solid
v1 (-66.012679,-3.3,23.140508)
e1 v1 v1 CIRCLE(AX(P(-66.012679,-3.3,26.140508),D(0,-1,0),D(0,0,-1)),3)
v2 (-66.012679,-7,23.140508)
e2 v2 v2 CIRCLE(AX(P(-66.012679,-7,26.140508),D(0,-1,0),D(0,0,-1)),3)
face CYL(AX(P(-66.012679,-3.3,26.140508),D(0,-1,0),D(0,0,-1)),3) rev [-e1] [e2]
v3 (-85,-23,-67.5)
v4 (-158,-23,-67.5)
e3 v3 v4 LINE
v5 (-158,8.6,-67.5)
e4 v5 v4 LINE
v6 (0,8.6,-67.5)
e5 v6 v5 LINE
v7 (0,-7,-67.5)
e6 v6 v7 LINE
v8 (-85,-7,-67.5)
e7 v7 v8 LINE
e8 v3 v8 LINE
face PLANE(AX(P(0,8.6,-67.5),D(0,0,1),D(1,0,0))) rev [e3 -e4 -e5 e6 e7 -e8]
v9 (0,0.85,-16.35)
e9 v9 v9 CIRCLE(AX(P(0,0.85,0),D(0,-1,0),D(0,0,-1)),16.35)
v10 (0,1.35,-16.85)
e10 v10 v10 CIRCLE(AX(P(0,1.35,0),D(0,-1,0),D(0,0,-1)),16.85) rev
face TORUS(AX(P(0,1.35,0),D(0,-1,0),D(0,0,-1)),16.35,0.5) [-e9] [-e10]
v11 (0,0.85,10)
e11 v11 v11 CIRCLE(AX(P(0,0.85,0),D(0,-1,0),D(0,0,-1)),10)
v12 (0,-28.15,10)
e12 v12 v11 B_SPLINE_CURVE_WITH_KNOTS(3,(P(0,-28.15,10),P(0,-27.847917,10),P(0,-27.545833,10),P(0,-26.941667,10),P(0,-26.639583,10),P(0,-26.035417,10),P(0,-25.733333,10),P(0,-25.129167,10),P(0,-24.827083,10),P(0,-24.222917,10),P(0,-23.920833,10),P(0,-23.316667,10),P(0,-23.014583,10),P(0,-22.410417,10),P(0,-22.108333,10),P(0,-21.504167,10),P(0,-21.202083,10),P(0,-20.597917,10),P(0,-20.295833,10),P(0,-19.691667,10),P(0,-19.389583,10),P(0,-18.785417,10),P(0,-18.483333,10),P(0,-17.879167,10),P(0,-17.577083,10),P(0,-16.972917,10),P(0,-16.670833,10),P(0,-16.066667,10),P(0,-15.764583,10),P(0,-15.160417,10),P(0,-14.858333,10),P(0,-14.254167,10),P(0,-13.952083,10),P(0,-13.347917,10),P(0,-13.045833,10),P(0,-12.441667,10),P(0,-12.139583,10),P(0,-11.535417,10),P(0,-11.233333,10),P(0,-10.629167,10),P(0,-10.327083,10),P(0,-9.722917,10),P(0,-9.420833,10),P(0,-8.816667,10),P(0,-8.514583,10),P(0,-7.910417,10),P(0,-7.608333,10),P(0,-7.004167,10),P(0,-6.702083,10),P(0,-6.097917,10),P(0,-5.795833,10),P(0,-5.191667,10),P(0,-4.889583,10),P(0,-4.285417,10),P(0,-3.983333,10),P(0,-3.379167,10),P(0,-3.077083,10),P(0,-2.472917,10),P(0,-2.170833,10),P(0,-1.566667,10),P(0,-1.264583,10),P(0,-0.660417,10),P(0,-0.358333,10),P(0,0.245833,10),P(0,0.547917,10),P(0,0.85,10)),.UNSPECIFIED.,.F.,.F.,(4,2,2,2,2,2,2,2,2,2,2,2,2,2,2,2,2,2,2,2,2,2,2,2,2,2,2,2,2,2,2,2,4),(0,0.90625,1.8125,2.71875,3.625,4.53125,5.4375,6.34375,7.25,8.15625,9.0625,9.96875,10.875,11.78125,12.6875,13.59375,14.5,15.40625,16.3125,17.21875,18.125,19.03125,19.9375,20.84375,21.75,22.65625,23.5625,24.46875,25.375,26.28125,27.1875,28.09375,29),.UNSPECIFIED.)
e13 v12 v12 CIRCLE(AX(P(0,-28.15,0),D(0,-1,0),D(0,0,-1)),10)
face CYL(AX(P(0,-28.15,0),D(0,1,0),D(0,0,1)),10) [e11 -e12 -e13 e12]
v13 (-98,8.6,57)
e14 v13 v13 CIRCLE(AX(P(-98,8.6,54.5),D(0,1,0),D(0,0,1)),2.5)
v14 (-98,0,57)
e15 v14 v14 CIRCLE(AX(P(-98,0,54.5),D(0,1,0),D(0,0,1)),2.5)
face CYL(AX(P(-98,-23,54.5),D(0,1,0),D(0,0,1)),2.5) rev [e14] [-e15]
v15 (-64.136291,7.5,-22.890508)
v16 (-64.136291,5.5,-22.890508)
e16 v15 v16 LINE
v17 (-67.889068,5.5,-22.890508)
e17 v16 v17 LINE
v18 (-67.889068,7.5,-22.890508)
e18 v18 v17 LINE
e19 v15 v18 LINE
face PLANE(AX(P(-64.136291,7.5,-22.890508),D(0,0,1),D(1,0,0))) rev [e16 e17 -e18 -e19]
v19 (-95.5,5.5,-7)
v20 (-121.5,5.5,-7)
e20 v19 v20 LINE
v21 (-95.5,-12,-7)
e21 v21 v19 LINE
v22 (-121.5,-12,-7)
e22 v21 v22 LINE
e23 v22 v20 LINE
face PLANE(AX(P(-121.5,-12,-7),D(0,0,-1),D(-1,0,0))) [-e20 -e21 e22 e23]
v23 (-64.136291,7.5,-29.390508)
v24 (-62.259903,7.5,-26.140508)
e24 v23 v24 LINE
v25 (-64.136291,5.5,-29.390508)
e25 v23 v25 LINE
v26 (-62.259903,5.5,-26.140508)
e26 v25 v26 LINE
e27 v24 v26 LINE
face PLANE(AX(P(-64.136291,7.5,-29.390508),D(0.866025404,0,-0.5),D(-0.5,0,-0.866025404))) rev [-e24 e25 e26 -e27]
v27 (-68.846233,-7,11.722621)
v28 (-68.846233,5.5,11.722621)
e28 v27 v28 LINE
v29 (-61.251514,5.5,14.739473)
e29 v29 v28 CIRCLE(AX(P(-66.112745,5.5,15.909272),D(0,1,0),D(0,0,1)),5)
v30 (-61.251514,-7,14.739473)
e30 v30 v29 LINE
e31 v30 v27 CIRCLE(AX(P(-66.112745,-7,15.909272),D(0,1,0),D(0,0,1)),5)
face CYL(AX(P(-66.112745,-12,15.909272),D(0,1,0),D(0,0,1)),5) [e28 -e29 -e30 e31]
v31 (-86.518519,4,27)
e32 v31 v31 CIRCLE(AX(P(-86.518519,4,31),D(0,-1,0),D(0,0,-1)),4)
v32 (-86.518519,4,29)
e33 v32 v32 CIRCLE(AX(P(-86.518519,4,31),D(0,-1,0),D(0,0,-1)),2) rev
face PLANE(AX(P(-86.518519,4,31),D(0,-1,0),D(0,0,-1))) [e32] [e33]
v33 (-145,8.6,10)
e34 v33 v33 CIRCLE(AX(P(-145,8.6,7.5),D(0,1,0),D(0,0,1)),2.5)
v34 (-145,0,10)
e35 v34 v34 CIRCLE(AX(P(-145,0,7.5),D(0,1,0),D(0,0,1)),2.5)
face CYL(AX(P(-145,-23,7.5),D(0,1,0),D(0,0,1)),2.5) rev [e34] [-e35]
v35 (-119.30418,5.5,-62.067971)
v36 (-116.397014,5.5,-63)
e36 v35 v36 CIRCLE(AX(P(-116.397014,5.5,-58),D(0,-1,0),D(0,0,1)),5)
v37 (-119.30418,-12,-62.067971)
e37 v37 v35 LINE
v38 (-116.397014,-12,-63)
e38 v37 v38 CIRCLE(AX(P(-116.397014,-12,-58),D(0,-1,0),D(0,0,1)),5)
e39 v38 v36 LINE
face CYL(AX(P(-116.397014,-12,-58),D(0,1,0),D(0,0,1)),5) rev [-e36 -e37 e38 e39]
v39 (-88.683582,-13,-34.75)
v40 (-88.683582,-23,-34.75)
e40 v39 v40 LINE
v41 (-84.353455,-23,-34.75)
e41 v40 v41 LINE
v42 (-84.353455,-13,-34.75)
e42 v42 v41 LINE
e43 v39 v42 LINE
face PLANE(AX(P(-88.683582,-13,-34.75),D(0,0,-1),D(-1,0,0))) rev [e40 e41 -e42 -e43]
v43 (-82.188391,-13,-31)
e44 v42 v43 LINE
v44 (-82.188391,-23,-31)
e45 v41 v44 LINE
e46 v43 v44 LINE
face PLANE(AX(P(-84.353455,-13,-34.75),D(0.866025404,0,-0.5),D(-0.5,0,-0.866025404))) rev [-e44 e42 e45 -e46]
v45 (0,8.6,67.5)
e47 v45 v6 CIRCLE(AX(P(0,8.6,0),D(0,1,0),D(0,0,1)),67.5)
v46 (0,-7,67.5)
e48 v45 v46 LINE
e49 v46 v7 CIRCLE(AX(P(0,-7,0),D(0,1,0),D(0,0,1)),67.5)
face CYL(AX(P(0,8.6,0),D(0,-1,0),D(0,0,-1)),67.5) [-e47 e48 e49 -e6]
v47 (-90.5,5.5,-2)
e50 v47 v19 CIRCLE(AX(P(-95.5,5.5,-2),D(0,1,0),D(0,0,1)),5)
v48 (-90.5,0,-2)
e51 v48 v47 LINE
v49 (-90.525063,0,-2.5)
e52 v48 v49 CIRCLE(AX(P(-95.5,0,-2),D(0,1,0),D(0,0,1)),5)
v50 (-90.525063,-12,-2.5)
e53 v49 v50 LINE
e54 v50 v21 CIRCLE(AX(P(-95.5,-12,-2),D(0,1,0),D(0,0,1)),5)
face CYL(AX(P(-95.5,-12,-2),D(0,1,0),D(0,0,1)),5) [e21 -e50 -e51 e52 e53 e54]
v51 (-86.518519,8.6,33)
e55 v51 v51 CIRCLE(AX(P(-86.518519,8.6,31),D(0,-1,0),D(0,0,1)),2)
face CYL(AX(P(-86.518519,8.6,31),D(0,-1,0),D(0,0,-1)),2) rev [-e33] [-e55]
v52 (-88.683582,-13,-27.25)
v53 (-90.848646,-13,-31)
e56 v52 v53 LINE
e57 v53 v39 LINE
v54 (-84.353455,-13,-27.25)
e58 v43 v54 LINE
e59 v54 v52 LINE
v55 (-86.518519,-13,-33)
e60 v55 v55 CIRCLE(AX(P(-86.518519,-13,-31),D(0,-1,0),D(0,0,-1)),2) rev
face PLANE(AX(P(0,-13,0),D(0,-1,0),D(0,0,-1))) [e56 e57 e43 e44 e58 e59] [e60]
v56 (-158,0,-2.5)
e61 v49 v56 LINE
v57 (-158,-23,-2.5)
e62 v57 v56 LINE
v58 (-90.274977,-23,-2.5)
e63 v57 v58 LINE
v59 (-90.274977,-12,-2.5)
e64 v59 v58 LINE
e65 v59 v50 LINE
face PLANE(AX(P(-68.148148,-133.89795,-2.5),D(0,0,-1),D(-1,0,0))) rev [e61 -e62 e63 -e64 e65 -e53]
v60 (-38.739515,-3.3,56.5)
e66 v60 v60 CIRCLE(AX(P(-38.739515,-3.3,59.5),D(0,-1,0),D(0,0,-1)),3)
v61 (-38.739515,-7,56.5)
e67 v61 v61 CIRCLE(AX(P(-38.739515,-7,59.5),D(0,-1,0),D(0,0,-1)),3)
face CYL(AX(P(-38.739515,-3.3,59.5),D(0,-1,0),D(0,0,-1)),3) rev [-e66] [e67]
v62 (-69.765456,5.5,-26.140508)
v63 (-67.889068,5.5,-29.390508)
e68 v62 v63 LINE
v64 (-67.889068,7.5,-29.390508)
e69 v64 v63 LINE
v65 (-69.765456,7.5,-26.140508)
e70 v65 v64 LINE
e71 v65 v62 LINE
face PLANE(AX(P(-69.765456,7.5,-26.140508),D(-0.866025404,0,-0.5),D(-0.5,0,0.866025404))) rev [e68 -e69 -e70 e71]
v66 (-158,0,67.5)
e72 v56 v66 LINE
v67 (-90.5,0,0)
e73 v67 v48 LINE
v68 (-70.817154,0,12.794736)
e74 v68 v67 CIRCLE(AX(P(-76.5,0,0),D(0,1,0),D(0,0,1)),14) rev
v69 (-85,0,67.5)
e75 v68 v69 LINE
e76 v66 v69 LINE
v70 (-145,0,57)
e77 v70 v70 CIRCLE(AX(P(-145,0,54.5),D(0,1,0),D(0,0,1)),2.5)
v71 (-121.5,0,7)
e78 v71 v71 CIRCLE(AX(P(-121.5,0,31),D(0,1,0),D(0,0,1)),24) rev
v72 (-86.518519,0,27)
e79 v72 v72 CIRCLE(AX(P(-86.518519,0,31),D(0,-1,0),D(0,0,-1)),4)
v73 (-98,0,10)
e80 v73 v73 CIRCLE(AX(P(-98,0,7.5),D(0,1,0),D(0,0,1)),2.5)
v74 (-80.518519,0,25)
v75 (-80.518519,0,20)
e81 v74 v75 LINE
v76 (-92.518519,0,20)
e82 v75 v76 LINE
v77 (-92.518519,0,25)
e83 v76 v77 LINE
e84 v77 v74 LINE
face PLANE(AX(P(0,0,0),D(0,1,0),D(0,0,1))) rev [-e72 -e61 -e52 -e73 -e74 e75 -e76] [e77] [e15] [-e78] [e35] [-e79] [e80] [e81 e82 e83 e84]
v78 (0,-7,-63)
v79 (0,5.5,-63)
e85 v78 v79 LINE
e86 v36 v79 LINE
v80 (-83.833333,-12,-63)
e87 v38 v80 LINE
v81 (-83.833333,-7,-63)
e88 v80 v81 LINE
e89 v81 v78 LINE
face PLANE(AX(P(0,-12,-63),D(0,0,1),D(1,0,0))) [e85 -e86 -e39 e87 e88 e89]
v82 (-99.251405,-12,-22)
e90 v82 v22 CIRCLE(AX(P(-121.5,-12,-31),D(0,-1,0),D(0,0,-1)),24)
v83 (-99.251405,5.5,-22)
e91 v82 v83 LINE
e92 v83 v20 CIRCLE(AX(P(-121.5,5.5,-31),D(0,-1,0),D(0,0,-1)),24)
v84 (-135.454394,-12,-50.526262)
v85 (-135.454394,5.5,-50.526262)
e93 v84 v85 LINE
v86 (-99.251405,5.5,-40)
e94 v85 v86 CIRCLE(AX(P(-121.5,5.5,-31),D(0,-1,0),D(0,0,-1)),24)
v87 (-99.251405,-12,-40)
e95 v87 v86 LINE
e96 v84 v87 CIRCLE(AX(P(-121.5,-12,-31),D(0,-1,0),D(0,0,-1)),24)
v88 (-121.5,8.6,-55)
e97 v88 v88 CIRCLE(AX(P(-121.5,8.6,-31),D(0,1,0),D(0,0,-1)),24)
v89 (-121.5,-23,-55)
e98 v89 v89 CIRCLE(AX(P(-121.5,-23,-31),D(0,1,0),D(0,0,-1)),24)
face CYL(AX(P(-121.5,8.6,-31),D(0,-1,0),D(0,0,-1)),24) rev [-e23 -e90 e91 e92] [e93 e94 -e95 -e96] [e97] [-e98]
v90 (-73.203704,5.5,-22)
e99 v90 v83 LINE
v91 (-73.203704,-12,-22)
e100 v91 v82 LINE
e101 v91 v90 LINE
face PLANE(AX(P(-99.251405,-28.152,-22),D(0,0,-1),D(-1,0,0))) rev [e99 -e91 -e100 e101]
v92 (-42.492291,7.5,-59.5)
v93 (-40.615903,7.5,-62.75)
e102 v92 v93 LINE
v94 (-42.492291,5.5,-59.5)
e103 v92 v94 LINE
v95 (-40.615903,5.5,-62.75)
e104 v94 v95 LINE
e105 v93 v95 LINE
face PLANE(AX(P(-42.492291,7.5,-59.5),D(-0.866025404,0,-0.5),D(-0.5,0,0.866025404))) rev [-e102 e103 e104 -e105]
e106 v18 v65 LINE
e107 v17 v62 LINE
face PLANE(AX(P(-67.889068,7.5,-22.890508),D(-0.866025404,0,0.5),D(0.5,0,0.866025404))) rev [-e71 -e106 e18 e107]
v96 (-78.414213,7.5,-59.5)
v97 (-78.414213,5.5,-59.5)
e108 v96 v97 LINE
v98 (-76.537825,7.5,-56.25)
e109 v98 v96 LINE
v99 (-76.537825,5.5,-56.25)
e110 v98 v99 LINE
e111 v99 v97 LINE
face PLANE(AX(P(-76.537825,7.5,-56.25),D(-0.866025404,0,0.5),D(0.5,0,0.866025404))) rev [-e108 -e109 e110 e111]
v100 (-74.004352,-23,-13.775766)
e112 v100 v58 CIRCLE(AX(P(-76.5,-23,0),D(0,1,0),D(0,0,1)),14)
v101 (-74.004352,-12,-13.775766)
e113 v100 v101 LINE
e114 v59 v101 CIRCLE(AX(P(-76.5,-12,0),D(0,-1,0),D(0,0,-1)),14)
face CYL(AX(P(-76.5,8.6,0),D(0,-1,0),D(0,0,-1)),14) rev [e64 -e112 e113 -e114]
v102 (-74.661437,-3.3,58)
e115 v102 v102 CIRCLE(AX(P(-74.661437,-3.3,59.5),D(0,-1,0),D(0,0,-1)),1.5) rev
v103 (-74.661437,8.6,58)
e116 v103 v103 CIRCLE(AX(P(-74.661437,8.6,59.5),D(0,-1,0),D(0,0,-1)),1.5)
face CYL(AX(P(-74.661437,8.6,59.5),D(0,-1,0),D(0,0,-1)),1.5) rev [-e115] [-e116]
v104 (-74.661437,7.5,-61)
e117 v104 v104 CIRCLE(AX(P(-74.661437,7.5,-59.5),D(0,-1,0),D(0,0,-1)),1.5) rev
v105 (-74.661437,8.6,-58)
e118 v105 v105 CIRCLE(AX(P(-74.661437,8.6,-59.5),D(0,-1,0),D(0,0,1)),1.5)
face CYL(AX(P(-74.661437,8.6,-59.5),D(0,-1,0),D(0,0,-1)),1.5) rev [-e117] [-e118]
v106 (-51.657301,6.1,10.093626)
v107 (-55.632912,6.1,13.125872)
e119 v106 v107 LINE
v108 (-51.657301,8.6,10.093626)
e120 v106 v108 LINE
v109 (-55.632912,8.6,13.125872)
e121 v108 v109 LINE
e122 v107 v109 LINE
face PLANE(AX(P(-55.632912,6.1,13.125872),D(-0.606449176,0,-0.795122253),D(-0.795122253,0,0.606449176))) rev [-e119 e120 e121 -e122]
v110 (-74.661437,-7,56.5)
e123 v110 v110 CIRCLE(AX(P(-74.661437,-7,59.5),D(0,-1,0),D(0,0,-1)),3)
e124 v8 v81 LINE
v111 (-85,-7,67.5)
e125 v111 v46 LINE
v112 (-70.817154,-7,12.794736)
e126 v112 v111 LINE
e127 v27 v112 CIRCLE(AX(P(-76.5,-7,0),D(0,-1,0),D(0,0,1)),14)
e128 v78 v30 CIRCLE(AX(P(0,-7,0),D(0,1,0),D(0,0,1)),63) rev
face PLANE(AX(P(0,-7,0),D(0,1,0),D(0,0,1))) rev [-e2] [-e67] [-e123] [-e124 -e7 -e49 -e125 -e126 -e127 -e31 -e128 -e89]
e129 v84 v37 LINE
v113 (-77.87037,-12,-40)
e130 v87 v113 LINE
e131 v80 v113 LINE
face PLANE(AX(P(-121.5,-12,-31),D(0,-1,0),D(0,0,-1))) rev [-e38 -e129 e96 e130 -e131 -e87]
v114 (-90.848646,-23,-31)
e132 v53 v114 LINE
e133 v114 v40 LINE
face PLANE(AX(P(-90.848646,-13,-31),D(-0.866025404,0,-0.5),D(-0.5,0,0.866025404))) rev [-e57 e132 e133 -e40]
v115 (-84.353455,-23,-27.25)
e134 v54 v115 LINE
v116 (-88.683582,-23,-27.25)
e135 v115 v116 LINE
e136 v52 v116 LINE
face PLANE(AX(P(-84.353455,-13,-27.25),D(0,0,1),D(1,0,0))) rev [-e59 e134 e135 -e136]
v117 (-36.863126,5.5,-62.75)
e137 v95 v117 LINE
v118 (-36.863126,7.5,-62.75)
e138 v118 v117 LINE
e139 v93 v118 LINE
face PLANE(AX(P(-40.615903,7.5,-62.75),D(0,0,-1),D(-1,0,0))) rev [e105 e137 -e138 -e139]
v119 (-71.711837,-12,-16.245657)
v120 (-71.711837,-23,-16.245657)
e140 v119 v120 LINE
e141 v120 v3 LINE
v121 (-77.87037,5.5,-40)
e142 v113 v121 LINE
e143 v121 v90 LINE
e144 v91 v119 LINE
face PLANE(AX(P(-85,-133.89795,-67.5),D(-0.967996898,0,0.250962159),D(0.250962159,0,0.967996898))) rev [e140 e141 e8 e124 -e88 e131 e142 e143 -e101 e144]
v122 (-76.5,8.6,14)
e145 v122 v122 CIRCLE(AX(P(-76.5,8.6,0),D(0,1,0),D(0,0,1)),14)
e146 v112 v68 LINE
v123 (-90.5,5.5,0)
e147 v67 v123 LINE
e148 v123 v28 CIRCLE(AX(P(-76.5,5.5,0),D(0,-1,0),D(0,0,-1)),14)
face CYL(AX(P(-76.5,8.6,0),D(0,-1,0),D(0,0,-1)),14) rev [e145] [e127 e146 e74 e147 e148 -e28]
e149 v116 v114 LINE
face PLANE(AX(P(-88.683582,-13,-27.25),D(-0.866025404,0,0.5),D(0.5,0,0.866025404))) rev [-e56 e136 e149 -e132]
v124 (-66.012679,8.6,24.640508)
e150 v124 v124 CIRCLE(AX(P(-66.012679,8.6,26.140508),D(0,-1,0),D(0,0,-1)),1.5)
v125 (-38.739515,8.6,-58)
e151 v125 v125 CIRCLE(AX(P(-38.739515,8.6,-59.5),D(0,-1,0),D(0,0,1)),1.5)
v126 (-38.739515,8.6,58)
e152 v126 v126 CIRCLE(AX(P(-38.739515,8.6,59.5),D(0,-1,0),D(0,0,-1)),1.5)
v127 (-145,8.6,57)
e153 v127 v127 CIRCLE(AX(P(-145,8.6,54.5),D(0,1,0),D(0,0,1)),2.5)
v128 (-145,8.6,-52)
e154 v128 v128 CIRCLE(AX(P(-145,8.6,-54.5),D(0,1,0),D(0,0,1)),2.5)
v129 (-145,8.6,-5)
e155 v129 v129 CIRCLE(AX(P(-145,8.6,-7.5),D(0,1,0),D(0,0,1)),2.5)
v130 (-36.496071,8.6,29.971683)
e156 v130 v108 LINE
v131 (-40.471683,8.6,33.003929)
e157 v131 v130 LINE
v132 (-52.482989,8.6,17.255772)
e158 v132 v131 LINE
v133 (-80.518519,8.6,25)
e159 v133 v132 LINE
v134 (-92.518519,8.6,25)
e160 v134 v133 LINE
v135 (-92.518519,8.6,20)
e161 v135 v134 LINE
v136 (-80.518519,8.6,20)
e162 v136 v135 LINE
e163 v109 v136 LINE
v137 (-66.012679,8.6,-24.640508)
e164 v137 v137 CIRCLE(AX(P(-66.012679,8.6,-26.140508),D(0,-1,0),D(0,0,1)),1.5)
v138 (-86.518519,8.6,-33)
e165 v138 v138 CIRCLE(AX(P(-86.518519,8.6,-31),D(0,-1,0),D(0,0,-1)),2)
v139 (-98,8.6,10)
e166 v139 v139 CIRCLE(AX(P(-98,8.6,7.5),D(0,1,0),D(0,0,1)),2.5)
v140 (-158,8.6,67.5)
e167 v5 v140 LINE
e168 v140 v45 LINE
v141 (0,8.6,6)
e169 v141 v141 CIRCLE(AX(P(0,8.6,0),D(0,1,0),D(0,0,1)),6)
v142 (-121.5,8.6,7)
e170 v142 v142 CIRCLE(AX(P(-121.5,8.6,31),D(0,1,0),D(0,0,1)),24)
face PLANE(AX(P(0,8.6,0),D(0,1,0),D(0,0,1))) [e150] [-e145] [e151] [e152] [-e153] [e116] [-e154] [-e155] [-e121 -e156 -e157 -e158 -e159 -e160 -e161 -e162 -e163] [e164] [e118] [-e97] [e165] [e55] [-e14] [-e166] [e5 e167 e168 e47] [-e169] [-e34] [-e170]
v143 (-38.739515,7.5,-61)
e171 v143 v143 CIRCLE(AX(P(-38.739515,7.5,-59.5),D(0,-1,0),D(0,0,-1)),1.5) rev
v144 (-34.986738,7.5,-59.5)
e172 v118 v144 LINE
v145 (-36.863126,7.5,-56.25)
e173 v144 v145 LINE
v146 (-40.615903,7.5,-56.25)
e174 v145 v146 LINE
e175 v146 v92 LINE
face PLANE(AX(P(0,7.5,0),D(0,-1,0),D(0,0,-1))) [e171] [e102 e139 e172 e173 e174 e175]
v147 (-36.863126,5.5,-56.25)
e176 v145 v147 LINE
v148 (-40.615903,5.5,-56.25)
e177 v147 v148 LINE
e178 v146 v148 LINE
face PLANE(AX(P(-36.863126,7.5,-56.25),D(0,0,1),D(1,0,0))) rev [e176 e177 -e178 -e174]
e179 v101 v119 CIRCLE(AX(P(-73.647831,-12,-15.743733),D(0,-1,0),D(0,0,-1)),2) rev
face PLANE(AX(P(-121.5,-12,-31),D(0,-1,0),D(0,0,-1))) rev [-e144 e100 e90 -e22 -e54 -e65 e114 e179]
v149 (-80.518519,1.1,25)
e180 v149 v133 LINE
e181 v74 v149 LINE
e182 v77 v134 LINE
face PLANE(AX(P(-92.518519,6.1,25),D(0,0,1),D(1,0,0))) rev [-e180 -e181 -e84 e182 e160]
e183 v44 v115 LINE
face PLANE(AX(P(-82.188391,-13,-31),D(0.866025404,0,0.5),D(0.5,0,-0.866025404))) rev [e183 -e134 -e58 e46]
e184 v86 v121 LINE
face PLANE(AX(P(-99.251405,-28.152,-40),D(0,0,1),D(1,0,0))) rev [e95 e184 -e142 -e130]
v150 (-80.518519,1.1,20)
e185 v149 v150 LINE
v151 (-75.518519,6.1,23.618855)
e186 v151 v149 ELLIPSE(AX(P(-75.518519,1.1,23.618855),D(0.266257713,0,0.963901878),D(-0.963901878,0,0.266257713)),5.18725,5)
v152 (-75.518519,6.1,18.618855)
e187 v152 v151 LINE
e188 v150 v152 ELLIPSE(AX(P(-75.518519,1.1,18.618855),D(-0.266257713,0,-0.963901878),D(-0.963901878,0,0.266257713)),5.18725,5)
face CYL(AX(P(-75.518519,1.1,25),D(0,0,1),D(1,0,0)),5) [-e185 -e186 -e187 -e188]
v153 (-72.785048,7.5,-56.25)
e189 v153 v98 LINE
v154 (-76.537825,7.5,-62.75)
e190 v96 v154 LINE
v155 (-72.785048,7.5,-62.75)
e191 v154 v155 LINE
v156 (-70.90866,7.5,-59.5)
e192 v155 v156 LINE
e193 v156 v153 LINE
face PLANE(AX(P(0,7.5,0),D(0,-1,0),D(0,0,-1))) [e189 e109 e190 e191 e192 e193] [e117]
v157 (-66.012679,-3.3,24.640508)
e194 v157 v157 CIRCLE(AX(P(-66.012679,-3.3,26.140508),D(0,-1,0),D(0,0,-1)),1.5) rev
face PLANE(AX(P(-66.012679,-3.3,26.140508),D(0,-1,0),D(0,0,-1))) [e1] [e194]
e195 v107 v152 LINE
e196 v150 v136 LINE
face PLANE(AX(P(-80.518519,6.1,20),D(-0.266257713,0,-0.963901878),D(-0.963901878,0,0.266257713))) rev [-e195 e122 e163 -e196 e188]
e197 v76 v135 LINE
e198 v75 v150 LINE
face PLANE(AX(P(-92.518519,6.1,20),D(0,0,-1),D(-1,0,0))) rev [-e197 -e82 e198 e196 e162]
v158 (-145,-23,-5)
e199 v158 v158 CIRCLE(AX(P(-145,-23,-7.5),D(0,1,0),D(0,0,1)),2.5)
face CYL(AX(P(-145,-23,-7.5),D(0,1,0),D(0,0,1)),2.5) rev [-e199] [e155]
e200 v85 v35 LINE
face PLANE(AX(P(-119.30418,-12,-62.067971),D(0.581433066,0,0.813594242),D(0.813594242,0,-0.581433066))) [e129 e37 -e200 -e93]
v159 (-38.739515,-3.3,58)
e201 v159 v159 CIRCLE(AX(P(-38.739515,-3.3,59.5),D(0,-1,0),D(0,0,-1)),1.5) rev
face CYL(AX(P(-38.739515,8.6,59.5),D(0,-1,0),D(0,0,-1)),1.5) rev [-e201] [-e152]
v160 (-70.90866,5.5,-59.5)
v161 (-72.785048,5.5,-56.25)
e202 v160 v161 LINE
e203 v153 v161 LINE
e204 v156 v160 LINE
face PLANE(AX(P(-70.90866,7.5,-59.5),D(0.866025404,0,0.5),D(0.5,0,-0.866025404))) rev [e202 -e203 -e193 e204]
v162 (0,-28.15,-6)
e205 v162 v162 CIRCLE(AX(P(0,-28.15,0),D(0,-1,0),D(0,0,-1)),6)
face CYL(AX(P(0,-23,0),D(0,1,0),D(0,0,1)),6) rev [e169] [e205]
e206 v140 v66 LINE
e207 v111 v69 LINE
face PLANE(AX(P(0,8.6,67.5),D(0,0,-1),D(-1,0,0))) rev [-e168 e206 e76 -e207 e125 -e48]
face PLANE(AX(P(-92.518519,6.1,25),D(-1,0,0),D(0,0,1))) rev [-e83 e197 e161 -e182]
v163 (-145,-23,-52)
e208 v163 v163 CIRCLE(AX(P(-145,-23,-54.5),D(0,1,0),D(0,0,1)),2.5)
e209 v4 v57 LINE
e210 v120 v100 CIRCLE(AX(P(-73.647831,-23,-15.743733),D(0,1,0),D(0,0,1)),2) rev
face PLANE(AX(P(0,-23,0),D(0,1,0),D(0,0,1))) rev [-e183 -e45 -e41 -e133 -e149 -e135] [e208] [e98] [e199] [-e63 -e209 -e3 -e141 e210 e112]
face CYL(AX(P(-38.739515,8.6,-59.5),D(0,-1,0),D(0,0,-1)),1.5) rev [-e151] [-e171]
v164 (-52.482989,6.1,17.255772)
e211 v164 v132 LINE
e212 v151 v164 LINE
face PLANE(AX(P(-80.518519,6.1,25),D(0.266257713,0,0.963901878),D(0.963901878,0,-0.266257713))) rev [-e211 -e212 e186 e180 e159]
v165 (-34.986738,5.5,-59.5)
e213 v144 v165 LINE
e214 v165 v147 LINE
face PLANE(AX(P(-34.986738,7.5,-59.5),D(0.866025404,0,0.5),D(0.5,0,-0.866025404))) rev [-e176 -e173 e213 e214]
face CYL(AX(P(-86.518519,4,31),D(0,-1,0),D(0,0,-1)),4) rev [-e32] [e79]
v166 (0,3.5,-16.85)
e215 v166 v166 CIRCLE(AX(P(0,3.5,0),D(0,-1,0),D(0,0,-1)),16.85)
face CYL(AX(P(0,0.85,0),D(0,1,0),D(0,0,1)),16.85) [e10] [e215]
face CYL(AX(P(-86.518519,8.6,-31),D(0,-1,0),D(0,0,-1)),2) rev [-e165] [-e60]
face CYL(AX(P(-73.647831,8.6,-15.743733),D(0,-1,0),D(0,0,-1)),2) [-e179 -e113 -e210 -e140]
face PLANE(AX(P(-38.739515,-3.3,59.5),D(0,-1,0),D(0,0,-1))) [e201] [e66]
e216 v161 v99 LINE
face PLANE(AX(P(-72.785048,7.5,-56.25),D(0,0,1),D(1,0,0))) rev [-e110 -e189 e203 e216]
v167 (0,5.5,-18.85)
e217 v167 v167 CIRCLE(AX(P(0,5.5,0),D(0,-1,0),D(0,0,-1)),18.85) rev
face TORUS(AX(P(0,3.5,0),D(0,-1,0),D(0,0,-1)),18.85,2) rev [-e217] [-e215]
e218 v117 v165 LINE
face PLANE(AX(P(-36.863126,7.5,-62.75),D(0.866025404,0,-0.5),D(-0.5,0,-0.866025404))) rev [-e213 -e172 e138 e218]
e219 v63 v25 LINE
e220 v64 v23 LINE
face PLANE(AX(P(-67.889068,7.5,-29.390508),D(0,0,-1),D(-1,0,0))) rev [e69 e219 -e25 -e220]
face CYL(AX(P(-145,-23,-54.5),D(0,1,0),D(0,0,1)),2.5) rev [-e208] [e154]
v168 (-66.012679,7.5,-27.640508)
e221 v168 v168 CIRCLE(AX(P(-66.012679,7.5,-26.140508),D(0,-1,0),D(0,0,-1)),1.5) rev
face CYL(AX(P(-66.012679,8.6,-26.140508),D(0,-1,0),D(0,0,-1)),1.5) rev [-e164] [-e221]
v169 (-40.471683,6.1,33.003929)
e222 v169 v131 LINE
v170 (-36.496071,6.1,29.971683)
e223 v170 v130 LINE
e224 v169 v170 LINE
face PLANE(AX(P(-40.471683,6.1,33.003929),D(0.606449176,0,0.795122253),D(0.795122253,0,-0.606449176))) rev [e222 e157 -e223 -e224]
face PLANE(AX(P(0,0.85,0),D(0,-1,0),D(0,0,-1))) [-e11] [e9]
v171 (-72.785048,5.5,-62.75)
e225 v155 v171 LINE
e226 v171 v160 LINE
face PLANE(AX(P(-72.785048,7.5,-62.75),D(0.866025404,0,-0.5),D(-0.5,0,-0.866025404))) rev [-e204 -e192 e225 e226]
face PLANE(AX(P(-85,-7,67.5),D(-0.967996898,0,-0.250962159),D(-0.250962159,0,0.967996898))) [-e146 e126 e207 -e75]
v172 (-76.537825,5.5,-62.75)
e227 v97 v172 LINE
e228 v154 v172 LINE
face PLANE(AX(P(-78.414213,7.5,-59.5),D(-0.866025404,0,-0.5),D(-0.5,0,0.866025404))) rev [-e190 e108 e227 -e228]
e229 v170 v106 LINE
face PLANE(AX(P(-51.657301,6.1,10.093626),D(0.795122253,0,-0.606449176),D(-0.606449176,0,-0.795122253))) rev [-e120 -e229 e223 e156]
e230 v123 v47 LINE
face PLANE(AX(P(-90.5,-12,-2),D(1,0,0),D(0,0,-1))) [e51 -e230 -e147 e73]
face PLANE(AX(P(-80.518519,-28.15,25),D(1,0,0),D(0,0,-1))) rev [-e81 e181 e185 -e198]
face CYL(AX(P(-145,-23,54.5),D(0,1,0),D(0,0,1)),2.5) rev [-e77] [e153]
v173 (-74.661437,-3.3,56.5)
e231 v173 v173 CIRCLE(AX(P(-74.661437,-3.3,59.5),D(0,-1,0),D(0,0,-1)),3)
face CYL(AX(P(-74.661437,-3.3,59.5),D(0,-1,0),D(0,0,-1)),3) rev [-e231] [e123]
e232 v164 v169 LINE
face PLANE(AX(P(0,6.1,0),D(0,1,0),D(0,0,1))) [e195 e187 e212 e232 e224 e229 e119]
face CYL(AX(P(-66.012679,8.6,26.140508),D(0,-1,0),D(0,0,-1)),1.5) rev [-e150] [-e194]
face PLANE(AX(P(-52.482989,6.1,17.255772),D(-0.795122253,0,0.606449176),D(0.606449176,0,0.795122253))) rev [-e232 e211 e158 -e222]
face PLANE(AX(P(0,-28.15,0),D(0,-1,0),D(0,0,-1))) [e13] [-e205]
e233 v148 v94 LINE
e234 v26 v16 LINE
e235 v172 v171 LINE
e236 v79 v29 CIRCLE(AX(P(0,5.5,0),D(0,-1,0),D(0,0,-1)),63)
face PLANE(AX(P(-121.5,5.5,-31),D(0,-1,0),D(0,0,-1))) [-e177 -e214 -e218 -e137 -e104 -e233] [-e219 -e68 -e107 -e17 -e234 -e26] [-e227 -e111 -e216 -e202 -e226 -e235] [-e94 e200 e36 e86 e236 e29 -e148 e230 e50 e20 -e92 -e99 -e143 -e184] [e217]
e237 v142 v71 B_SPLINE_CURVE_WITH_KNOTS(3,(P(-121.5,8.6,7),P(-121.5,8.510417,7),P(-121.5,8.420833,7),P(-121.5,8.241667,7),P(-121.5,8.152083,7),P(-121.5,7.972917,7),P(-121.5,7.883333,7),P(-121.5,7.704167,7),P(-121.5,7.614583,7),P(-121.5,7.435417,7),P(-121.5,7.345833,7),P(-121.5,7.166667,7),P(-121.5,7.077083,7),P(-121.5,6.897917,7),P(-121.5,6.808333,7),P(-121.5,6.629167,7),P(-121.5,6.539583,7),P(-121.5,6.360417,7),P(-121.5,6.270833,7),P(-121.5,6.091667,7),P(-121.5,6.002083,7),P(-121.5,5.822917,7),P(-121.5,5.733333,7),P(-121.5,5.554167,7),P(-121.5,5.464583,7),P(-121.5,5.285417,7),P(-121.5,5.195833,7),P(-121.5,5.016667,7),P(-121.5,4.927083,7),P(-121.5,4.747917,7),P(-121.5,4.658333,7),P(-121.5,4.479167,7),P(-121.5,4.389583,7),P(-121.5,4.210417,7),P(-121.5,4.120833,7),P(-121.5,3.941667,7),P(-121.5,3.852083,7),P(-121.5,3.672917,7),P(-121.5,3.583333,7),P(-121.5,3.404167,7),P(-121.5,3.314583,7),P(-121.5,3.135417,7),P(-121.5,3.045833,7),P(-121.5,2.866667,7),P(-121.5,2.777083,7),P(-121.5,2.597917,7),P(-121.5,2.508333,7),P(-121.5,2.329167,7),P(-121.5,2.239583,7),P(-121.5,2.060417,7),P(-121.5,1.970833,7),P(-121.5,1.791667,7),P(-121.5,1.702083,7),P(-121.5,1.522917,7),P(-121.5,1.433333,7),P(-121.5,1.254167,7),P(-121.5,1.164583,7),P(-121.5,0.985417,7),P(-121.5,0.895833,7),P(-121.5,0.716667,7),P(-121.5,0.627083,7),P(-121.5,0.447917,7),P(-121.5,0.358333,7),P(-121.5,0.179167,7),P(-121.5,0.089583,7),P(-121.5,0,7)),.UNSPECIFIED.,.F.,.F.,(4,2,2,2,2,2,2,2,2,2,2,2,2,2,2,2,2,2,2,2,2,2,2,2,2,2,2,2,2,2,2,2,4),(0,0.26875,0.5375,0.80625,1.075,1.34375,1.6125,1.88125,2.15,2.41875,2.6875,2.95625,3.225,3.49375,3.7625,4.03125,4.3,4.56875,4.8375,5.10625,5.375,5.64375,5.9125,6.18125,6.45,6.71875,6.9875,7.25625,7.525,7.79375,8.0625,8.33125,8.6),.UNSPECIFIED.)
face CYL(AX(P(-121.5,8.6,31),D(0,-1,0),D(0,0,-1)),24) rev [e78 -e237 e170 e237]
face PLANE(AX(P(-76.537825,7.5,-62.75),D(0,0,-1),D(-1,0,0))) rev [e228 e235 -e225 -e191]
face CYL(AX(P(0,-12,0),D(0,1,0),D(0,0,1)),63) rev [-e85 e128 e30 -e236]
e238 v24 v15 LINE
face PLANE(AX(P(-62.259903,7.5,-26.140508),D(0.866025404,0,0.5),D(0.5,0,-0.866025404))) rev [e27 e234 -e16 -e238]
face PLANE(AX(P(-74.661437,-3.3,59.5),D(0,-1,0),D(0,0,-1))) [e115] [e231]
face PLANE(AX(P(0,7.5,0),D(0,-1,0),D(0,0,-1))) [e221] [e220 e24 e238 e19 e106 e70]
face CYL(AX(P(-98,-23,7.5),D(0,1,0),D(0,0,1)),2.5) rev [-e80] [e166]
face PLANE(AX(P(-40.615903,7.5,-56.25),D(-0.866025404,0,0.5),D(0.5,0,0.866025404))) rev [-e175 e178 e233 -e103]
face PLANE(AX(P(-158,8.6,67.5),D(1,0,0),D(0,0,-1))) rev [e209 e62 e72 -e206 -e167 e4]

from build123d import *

# Parameters (mm, degrees)
SALIENTE_EXTRUIR4_DEPTH    = 8.6
SALIENTE_EXTRUIR2_DEPTH    = 23
CORTAR_EXTRUIR1_DEPTH      = 174.347194959
CORTAR_EXTRUIR1_DEPTH_BACK = 174.347194959
CROQUIS2_R                 = 14
CROQUIS2_R_2               = 24
CROQUIS5_R                 = 2.5
CORTAR_EXTRUIR2_DEPTH      = 175.696336539
SALIENTE_EXTRUIR3_START    = -15.6
SALIENTE_EXTRUIR3_DEPTH    = 15.6
CORTAR_EXTRUIR3_DEPTH      = 174.347194959
CORTAR_EXTRUIR3_DEPTH_BACK = 174.347194959
CROQUIS7_R                 = 6
CORTAR_EXTRUIR4_DEPTH      = 5
CORTAR_EXTRUIR4_DEPTH_BACK = 12.5
REDONDEO1_R                = 2
CROQUIS9_R                 = 16.85
CROQUIS9_R_2               = 6
SALIENTE_EXTRUIR5_DEPTH    = 4.65
CROQUIS10_R                = 10
CROQUIS10_R_2              = 6
SALIENTE_EXTRUIR6_DEPTH    = 29
REDONDEO2_R                = 0.5
REDONDEO3_R                = 2
SALIENTE_EXTRUIR7_REACH    = 177.079
CROQUIS12_R                = 1.5
CORTAR_EXTRUIR5_DEPTH      = 174.111445318
CORTAR_EXTRUIR6_DEPTH      = 2
CROQUIS14_R                = 3
CORTAR_EXTRUIR7_DEPTH      = 3.7
CROQUIS15_R                = 2
CORTAR_EXTRUIR8_DEPTH      = 175.696336539
CROQUIS16_R                = 4
CORTAR_EXTRUIR9_DEPTH      = 4
CORTAR_EXTRUIR10_DEPTH     = 10
CORTAR_EXTRUIR11_DEPTH     = 2.5
CROQUIS20_W                = 12
CROQUIS20_H                = 5
CORTAR_EXTRUIR12_DEPTH     = 176.700917755
REDONDEO4_R                = 5


with BuildPart() as part:
    # Croquis1 → Saliente-Extruir4 (new body)
    with BuildSketch(Plane(origin=(0, 0, 0), x_dir=(1, 0, 0), z_dir=(0, 1, 0))):
        with BuildLine():
            Line((0, -67.5), (-158, -67.5))
            Line((-158, -67.5), (-158, 67.5))
            Line((-158, 67.5), (0, 67.5))
            ThreePointArc((0, 67.5), (67.5, 0), (0, -67.5))
        make_face()
    extrude(amount=SALIENTE_EXTRUIR4_DEPTH)

    # Croquis3 → Saliente-Extruir2 (add)
    with BuildSketch(Plane.XZ):
        Polygon((-85, -67.5), (-68.148148148, -2.5), (-158, -2.5), (-158, -67.5), align=None)
    extrude(amount=SALIENTE_EXTRUIR2_DEPTH)

    # Croquis2 → Cortar-Extruir1 (cut, two sides: drawn at the far end of the back side and taken through both)
    with BuildSketch(Plane(origin=(0, 0, 0), x_dir=(1, 0, 0), z_dir=(0, 1, 0)).offset(-CORTAR_EXTRUIR1_DEPTH_BACK)):
        with Locations(Location((-76.5, 0, 0), (0, 0, 66.051358792))):
            Circle(CROQUIS2_R)
        with Locations(Location((-121.5, 31, 0), (0, 0, 90))):
            Circle(CROQUIS2_R_2)
        with Locations(Location((-121.5, -31, 0), (0, 0, 90))):
            Circle(CROQUIS2_R_2)
    extrude(amount=CORTAR_EXTRUIR1_DEPTH + CORTAR_EXTRUIR1_DEPTH_BACK, mode=Mode.SUBTRACT)

    # Croquis5 → Cortar-Extruir2 (cut, through all)
    with BuildSketch(Plane(origin=(0, 8.6, 0), x_dir=(1, 0, 0), z_dir=(0, 1, 0))):
        with Locations(Location((-145, -7.5, 0), (0, 0, 270))):
            Circle(CROQUIS5_R)
        with Locations(Location((-145, -54.5, 0), (0, 0, 270))):
            Circle(CROQUIS5_R)
        with Locations(Location((-98, -54.5, 0), (0, 0, 270))):
            Circle(CROQUIS5_R)
        with Locations(Location((-98, -7.5, 0), (0, 0, 270))):
            Circle(CROQUIS5_R)
        with Locations(Location((-145, 7.5, 0), (0, 0, 270))):
            Circle(CROQUIS5_R)
        with Locations(Location((-145, 54.5, 0), (0, 0, 270))):
            Circle(CROQUIS5_R)
    extrude(amount=-CORTAR_EXTRUIR2_DEPTH, mode=Mode.SUBTRACT)

    # Croquis6 → Saliente-Extruir3 (add)
    with BuildSketch(Plane(origin=(0, 8.6, 0), x_dir=(1, 0, 0), z_dir=(0, 1, 0)).offset(SALIENTE_EXTRUIR3_START)):
        with BuildLine():
            Line((0, -67.5), (-85, -67.5))
            Line((-85, -67.5), (-70.817153658, -12.794735536))
            ThreePointArc((-70.817153658, -12.794735536), (-62.5, 0), (-70.817153658, 12.794735536))
            Line((-70.817153658, 12.794735536), (-85, 67.5))
            Line((-85, 67.5), (0, 67.5))
            ThreePointArc((0, 67.5), (67.5, 0), (0, -67.5))
        make_face()
    extrude(amount=SALIENTE_EXTRUIR3_DEPTH)

    # Croquis7 → Cortar-Extruir3 (cut, two sides: drawn at the far end of the back side and taken through both)
    with BuildSketch(Plane(origin=(0, 0, 0), x_dir=(1, 0, 0), z_dir=(0, 1, 0)).offset(-CORTAR_EXTRUIR3_DEPTH_BACK)):
        with Locations(Location((0, 0, 0), (0, 0, 270))):
            Circle(CROQUIS7_R)
    extrude(amount=CORTAR_EXTRUIR3_DEPTH + CORTAR_EXTRUIR3_DEPTH_BACK, mode=Mode.SUBTRACT)

    # Croquis8 → Cortar-Extruir4 (cut, two sides: drawn at the far end of the back side and taken through both)
    with BuildSketch(Plane.XZ.offset(7).offset(-CORTAR_EXTRUIR4_DEPTH_BACK)):
        with BuildLine():
            Line((0, -63), (-116.397014468, -63))
            ThreePointArc((-116.397014468, -63), (-117.923471798, -62.761294784), (-119.304179798, -62.067971208))
            Line((-119.304179798, -62.067971208), (-135.454393581, -50.526261798))
            ThreePointArc((-135.454393581, -50.526261798), (-144.354214963, -23.673004816), (-121.5, -7))
            Line((-121.5, -7), (-95.5, -7))
            ThreePointArc((-95.5, -7), (-91.964466094, -5.535533906), (-90.5, -2))
            Line((-90.5, -2), (-90.5, 0))
            ThreePointArc((-90.5, 0), (-84.130208097, 11.737969347), (-70.817153658, 12.794735536))
            ThreePointArc((-70.817153658, 12.794735536), (-69.810181657, 12.29822469), (-68.84623323, 11.722621474))
            ThreePointArc((-68.84623323, 11.722621474), (-64.266892893, 11.262463458), (-61.251513841, 14.739472589))
            ThreePointArc((-61.251513841, 14.739472589), (49.485284546, 38.989827051), (0, -63))
        make_face()
    extrude(amount=CORTAR_EXTRUIR4_DEPTH + CORTAR_EXTRUIR4_DEPTH_BACK, mode=Mode.SUBTRACT)


with BuildPart() as cortar_extruir4_kept_piece:
    # of the separate pieces the step leaves, the one the design keeps (cortar_extruir4_pieces_kept)
    add(part.part.solids().sort_by_distance((0, 8.6, 67.5))[0])

    # Redondeo1
    redondeo1_edges = [cortar_extruir4_kept_piece.edges().sort_by_distance(p)[0] for p in [
        (-70.817153658, -17.5, -12.794735536),
    ]]
    fillet(redondeo1_edges, radius=REDONDEO1_R)

    # Croquis9 → Saliente-Extruir5 (add)
    with BuildSketch(Plane.XZ.offset(-5.5)):
        with Locations(Location((0, 0, 0), (0, 0, 270))):
            Circle(CROQUIS9_R)
        with Locations(Location((0, 0, 0), (0, 0, 90))):
            Circle(CROQUIS9_R_2, mode=Mode.SUBTRACT)
    extrude(amount=SALIENTE_EXTRUIR5_DEPTH)

    # Croquis10 → Saliente-Extruir6 (add)
    with BuildSketch(Plane.XZ.offset(-0.85)):
        with Locations(Location((0, 0, 0), (0, 0, 90))):
            Circle(CROQUIS10_R)
        with Locations(Location((0, 0, 0), (0, 0, 90))):
            Circle(CROQUIS10_R_2, mode=Mode.SUBTRACT)
    extrude(amount=SALIENTE_EXTRUIR6_DEPTH)

    # Redondeo2
    redondeo2_edges = [cortar_extruir4_kept_piece.edges().sort_by_distance(p)[0] for p in [
        (0, 0.85, 16.85),
    ]]
    fillet(redondeo2_edges, radius=REDONDEO2_R)

    # Redondeo3
    redondeo3_edges = [cortar_extruir4_kept_piece.edges().sort_by_distance(p)[0] for p in [
        (0, 5.5, 16.85),
    ]]
    fillet(redondeo3_edges, radius=REDONDEO3_R)

    # Croquis11 → Saliente-Extruir7 (add, up to next)
    with BuildSketch(Plane.XZ.offset(-5.5), mode=Mode.PRIVATE) as saliente_extruir7_sk1:
        with BuildLine():
            Line((-73.203703704, -22), (-77.87037037, -40))
            Line((-77.87037037, -40), (-99.251404539, -40))
            ThreePointArc((-99.251404539, -40), (-97.5, -31), (-99.251404539, -22))
            Line((-99.251404539, -22), (-73.203703704, -22))
        make_face()
    saliente_extruir7_tool1 = extrude(saliente_extruir7_sk1.sketch, amount=SALIENTE_EXTRUIR7_REACH, mode=Mode.PRIVATE) - cortar_extruir4_kept_piece.part
    add(saliente_extruir7_tool1.solids().sort_by_distance((-86.771742, 5.5, -30.689413))[0])

    # Croquis12 → Cortar-Extruir5 (cut, through all)
    with BuildSketch(Plane.XZ.offset(7)):
        with Locations(Location((-74.661436633, 59.5, 0), (0, 0, 270))):
            Circle(CROQUIS12_R)
        with Locations(Location((-66.012679429, 26.140507926, 0), (0, 0, 270))):
            Circle(CROQUIS12_R)
        with Locations(Location((-38.73951471, 59.5, 0), (0, 0, 270))):
            Circle(CROQUIS12_R)
        with Locations(Location((-38.73951471, -59.5, 0), (0, 0, 270))):
            Circle(CROQUIS12_R)
        with Locations(Location((-74.661436633, -59.5, 0), (0, 0, 270))):
            Circle(CROQUIS12_R)
        with Locations(Location((-66.012679429, -26.140507926, 0), (0, 0, 270))):
            Circle(CROQUIS12_R)
    extrude(amount=-CORTAR_EXTRUIR5_DEPTH, mode=Mode.SUBTRACT)

    # Croquis13 → Cortar-Extruir6 (cut)
    with BuildSketch(Plane.XZ.offset(-5.5)):
        Polygon((-70.908659884, -59.5), (-72.785048259, -56.25), (-76.537825008, -56.25), (-78.414213383, -59.5), (-76.537825008, -62.75), (-72.785048259, -62.75), align=None)
        Polygon((-62.259902679, -26.140507926), (-64.136291054, -22.890507926), (-67.889067804, -22.890507926), (-69.765456179, -26.140507926), (-67.889067804, -29.390507926), (-64.136291054, -29.390507926), align=None)
        Polygon((-34.986737961, -59.5), (-36.863126336, -56.25), (-40.615903085, -56.25), (-42.49229146, -59.5), (-40.615903085, -62.75), (-36.863126336, -62.75), align=None)
    extrude(amount=-CORTAR_EXTRUIR6_DEPTH, mode=Mode.SUBTRACT)

    # Croquis14 → Cortar-Extruir7 (cut)
    with BuildSketch(Plane.XZ.offset(7)):
        with Locations(Location((-66.012679429, 26.140507926, 0), (0, 0, 270))):
            Circle(CROQUIS14_R)
        with Locations(Location((-74.661436633, 59.5, 0), (0, 0, 270))):
            Circle(CROQUIS14_R)
        with Locations(Location((-38.73951471, 59.5, 0), (0, 0, 270))):
            Circle(CROQUIS14_R)
    extrude(amount=-CORTAR_EXTRUIR7_DEPTH, mode=Mode.SUBTRACT)

    # Croquis15 → Cortar-Extruir8 (cut, through all)
    with BuildSketch(Plane.XZ.offset(23)):
        with Locations(Location((-86.518518519, -31, 0), (0, 0, 270))):
            Circle(CROQUIS15_R)
        with Locations(Location((-86.518518519, 31, 0), (0, 0, 90))):
            Circle(CROQUIS15_R)
    extrude(amount=-CORTAR_EXTRUIR8_DEPTH, mode=Mode.SUBTRACT)

    # Croquis16 → Cortar-Extruir9 (cut)
    with BuildSketch(Plane.XZ):
        with Locations(Location((-86.518518519, 31, 0), (0, 0, 270))):
            Circle(CROQUIS16_R)
    extrude(amount=-CORTAR_EXTRUIR9_DEPTH, mode=Mode.SUBTRACT)

    # Croquis17 → Cortar-Extruir10 (cut)
    with BuildSketch(Plane.XZ.offset(23)):
        Polygon((-82.1883915, -31), (-84.353455009, -27.25), (-88.683582028, -27.25), (-90.848645537, -31), (-88.683582028, -34.75), (-84.353455009, -34.75), align=None)
    extrude(amount=-CORTAR_EXTRUIR10_DEPTH, mode=Mode.SUBTRACT)

    # Croquis19 → Cortar-Extruir11 (cut)
    with BuildSketch(Plane(origin=(0, 8.6, 0), x_dir=(1, 0, 0), z_dir=(0, 1, 0))):
        Polygon((-52.482988664, -17.255771853), (-40.471682692, -33.003928572), (-36.496071428, -29.971682692), (-51.657300826, -10.09362637), (-55.63291209, -13.12587225), (-80.518518519, -20), (-92.518518519, -20), (-92.518518519, -25), (-80.518518519, -25), align=None)
    extrude(amount=-CORTAR_EXTRUIR11_DEPTH, mode=Mode.SUBTRACT)

    # Croquis20 → Cortar-Extruir12 (cut, through all)
    with BuildSketch(Plane(origin=(0, 8.6, 0), x_dir=(1, 0, 0), z_dir=(0, 1, 0))):
        with Locations((-86.518518519, -22.5)):
            Rectangle(CROQUIS20_W, CROQUIS20_H)
    extrude(amount=-CORTAR_EXTRUIR12_DEPTH, mode=Mode.SUBTRACT)

    # Redondeo4
    # the kernel refuses this fillet: 5 mm, written as the material it takes off along each edge
    with BuildSketch(Plane(origin=(-80.518518519, 6.1, 25), x_dir=(0, -1, 0), z_dir=(0, 0, -1))) as redondeo4_piece_1_section:
        with BuildLine():
            CenterArc((REDONDEO4_R, -REDONDEO4_R), REDONDEO4_R, 90, 90)
            Line((0, -REDONDEO4_R), (0, 0))
            Line((0, 0), (REDONDEO4_R, 0))
        make_face()
    redondeo4_piece_1 = extrude(amount=5, mode=Mode.PRIVATE)
    redondeo4_piece_1 = split(redondeo4_piece_1, bisect_by=Plane(origin=(-78.850583618, 4.928175606, 24.539267905), z_dir=(-0.26625771274306737, 0, -0.9639018779963188)), keep=Keep.TOP, mode=Mode.PRIVATE)
    redondeo4_piece_1 = split(redondeo4_piece_1, bisect_by=Plane(origin=(-80.133815165, 4.928175606, 19.893733753), z_dir=(0.2662577127430677, 0, 0.9639018779963188)), keep=Keep.TOP, mode=Mode.PRIVATE)
    add(redondeo4_piece_1, mode=Mode.SUBTRACT)
    with BuildSketch(Plane(origin=(-80.518518519, 6.1, 25), x_dir=(0, -1, 0), z_dir=(0, 0, -1))) as redondeo4_piece_2_section:
        with BuildLine():
            CenterArc((REDONDEO4_R, -REDONDEO4_R), REDONDEO4_R, 90, 90)
            Line((0, -REDONDEO4_R), (0, 0))
            Line((0, 0), (REDONDEO4_R, 0))
        make_face()
    redondeo4_piece_2 = extrude(amount=17.5, mode=Mode.PRIVATE)
    redondeo4_piece_2 = split(redondeo4_piece_2, bisect_by=Plane(origin=(-78.44415934, 5.567637436, 19.427001708), z_dir=(0.2662577127430677, 0, 0.9639018779963188)), keep=Keep.TOP, mode=Mode.PRIVATE)
    redondeo4_piece_2 = split(redondeo4_piece_2, bisect_by=Plane(origin=(-78.36792826, 5.567637436, 20), z_dir=(0, 0, -1)), keep=Keep.TOP, mode=Mode.PRIVATE)
    add(redondeo4_piece_2, mode=Mode.SUBTRACT)


solid = cortar_extruir4_kept_piece.part
